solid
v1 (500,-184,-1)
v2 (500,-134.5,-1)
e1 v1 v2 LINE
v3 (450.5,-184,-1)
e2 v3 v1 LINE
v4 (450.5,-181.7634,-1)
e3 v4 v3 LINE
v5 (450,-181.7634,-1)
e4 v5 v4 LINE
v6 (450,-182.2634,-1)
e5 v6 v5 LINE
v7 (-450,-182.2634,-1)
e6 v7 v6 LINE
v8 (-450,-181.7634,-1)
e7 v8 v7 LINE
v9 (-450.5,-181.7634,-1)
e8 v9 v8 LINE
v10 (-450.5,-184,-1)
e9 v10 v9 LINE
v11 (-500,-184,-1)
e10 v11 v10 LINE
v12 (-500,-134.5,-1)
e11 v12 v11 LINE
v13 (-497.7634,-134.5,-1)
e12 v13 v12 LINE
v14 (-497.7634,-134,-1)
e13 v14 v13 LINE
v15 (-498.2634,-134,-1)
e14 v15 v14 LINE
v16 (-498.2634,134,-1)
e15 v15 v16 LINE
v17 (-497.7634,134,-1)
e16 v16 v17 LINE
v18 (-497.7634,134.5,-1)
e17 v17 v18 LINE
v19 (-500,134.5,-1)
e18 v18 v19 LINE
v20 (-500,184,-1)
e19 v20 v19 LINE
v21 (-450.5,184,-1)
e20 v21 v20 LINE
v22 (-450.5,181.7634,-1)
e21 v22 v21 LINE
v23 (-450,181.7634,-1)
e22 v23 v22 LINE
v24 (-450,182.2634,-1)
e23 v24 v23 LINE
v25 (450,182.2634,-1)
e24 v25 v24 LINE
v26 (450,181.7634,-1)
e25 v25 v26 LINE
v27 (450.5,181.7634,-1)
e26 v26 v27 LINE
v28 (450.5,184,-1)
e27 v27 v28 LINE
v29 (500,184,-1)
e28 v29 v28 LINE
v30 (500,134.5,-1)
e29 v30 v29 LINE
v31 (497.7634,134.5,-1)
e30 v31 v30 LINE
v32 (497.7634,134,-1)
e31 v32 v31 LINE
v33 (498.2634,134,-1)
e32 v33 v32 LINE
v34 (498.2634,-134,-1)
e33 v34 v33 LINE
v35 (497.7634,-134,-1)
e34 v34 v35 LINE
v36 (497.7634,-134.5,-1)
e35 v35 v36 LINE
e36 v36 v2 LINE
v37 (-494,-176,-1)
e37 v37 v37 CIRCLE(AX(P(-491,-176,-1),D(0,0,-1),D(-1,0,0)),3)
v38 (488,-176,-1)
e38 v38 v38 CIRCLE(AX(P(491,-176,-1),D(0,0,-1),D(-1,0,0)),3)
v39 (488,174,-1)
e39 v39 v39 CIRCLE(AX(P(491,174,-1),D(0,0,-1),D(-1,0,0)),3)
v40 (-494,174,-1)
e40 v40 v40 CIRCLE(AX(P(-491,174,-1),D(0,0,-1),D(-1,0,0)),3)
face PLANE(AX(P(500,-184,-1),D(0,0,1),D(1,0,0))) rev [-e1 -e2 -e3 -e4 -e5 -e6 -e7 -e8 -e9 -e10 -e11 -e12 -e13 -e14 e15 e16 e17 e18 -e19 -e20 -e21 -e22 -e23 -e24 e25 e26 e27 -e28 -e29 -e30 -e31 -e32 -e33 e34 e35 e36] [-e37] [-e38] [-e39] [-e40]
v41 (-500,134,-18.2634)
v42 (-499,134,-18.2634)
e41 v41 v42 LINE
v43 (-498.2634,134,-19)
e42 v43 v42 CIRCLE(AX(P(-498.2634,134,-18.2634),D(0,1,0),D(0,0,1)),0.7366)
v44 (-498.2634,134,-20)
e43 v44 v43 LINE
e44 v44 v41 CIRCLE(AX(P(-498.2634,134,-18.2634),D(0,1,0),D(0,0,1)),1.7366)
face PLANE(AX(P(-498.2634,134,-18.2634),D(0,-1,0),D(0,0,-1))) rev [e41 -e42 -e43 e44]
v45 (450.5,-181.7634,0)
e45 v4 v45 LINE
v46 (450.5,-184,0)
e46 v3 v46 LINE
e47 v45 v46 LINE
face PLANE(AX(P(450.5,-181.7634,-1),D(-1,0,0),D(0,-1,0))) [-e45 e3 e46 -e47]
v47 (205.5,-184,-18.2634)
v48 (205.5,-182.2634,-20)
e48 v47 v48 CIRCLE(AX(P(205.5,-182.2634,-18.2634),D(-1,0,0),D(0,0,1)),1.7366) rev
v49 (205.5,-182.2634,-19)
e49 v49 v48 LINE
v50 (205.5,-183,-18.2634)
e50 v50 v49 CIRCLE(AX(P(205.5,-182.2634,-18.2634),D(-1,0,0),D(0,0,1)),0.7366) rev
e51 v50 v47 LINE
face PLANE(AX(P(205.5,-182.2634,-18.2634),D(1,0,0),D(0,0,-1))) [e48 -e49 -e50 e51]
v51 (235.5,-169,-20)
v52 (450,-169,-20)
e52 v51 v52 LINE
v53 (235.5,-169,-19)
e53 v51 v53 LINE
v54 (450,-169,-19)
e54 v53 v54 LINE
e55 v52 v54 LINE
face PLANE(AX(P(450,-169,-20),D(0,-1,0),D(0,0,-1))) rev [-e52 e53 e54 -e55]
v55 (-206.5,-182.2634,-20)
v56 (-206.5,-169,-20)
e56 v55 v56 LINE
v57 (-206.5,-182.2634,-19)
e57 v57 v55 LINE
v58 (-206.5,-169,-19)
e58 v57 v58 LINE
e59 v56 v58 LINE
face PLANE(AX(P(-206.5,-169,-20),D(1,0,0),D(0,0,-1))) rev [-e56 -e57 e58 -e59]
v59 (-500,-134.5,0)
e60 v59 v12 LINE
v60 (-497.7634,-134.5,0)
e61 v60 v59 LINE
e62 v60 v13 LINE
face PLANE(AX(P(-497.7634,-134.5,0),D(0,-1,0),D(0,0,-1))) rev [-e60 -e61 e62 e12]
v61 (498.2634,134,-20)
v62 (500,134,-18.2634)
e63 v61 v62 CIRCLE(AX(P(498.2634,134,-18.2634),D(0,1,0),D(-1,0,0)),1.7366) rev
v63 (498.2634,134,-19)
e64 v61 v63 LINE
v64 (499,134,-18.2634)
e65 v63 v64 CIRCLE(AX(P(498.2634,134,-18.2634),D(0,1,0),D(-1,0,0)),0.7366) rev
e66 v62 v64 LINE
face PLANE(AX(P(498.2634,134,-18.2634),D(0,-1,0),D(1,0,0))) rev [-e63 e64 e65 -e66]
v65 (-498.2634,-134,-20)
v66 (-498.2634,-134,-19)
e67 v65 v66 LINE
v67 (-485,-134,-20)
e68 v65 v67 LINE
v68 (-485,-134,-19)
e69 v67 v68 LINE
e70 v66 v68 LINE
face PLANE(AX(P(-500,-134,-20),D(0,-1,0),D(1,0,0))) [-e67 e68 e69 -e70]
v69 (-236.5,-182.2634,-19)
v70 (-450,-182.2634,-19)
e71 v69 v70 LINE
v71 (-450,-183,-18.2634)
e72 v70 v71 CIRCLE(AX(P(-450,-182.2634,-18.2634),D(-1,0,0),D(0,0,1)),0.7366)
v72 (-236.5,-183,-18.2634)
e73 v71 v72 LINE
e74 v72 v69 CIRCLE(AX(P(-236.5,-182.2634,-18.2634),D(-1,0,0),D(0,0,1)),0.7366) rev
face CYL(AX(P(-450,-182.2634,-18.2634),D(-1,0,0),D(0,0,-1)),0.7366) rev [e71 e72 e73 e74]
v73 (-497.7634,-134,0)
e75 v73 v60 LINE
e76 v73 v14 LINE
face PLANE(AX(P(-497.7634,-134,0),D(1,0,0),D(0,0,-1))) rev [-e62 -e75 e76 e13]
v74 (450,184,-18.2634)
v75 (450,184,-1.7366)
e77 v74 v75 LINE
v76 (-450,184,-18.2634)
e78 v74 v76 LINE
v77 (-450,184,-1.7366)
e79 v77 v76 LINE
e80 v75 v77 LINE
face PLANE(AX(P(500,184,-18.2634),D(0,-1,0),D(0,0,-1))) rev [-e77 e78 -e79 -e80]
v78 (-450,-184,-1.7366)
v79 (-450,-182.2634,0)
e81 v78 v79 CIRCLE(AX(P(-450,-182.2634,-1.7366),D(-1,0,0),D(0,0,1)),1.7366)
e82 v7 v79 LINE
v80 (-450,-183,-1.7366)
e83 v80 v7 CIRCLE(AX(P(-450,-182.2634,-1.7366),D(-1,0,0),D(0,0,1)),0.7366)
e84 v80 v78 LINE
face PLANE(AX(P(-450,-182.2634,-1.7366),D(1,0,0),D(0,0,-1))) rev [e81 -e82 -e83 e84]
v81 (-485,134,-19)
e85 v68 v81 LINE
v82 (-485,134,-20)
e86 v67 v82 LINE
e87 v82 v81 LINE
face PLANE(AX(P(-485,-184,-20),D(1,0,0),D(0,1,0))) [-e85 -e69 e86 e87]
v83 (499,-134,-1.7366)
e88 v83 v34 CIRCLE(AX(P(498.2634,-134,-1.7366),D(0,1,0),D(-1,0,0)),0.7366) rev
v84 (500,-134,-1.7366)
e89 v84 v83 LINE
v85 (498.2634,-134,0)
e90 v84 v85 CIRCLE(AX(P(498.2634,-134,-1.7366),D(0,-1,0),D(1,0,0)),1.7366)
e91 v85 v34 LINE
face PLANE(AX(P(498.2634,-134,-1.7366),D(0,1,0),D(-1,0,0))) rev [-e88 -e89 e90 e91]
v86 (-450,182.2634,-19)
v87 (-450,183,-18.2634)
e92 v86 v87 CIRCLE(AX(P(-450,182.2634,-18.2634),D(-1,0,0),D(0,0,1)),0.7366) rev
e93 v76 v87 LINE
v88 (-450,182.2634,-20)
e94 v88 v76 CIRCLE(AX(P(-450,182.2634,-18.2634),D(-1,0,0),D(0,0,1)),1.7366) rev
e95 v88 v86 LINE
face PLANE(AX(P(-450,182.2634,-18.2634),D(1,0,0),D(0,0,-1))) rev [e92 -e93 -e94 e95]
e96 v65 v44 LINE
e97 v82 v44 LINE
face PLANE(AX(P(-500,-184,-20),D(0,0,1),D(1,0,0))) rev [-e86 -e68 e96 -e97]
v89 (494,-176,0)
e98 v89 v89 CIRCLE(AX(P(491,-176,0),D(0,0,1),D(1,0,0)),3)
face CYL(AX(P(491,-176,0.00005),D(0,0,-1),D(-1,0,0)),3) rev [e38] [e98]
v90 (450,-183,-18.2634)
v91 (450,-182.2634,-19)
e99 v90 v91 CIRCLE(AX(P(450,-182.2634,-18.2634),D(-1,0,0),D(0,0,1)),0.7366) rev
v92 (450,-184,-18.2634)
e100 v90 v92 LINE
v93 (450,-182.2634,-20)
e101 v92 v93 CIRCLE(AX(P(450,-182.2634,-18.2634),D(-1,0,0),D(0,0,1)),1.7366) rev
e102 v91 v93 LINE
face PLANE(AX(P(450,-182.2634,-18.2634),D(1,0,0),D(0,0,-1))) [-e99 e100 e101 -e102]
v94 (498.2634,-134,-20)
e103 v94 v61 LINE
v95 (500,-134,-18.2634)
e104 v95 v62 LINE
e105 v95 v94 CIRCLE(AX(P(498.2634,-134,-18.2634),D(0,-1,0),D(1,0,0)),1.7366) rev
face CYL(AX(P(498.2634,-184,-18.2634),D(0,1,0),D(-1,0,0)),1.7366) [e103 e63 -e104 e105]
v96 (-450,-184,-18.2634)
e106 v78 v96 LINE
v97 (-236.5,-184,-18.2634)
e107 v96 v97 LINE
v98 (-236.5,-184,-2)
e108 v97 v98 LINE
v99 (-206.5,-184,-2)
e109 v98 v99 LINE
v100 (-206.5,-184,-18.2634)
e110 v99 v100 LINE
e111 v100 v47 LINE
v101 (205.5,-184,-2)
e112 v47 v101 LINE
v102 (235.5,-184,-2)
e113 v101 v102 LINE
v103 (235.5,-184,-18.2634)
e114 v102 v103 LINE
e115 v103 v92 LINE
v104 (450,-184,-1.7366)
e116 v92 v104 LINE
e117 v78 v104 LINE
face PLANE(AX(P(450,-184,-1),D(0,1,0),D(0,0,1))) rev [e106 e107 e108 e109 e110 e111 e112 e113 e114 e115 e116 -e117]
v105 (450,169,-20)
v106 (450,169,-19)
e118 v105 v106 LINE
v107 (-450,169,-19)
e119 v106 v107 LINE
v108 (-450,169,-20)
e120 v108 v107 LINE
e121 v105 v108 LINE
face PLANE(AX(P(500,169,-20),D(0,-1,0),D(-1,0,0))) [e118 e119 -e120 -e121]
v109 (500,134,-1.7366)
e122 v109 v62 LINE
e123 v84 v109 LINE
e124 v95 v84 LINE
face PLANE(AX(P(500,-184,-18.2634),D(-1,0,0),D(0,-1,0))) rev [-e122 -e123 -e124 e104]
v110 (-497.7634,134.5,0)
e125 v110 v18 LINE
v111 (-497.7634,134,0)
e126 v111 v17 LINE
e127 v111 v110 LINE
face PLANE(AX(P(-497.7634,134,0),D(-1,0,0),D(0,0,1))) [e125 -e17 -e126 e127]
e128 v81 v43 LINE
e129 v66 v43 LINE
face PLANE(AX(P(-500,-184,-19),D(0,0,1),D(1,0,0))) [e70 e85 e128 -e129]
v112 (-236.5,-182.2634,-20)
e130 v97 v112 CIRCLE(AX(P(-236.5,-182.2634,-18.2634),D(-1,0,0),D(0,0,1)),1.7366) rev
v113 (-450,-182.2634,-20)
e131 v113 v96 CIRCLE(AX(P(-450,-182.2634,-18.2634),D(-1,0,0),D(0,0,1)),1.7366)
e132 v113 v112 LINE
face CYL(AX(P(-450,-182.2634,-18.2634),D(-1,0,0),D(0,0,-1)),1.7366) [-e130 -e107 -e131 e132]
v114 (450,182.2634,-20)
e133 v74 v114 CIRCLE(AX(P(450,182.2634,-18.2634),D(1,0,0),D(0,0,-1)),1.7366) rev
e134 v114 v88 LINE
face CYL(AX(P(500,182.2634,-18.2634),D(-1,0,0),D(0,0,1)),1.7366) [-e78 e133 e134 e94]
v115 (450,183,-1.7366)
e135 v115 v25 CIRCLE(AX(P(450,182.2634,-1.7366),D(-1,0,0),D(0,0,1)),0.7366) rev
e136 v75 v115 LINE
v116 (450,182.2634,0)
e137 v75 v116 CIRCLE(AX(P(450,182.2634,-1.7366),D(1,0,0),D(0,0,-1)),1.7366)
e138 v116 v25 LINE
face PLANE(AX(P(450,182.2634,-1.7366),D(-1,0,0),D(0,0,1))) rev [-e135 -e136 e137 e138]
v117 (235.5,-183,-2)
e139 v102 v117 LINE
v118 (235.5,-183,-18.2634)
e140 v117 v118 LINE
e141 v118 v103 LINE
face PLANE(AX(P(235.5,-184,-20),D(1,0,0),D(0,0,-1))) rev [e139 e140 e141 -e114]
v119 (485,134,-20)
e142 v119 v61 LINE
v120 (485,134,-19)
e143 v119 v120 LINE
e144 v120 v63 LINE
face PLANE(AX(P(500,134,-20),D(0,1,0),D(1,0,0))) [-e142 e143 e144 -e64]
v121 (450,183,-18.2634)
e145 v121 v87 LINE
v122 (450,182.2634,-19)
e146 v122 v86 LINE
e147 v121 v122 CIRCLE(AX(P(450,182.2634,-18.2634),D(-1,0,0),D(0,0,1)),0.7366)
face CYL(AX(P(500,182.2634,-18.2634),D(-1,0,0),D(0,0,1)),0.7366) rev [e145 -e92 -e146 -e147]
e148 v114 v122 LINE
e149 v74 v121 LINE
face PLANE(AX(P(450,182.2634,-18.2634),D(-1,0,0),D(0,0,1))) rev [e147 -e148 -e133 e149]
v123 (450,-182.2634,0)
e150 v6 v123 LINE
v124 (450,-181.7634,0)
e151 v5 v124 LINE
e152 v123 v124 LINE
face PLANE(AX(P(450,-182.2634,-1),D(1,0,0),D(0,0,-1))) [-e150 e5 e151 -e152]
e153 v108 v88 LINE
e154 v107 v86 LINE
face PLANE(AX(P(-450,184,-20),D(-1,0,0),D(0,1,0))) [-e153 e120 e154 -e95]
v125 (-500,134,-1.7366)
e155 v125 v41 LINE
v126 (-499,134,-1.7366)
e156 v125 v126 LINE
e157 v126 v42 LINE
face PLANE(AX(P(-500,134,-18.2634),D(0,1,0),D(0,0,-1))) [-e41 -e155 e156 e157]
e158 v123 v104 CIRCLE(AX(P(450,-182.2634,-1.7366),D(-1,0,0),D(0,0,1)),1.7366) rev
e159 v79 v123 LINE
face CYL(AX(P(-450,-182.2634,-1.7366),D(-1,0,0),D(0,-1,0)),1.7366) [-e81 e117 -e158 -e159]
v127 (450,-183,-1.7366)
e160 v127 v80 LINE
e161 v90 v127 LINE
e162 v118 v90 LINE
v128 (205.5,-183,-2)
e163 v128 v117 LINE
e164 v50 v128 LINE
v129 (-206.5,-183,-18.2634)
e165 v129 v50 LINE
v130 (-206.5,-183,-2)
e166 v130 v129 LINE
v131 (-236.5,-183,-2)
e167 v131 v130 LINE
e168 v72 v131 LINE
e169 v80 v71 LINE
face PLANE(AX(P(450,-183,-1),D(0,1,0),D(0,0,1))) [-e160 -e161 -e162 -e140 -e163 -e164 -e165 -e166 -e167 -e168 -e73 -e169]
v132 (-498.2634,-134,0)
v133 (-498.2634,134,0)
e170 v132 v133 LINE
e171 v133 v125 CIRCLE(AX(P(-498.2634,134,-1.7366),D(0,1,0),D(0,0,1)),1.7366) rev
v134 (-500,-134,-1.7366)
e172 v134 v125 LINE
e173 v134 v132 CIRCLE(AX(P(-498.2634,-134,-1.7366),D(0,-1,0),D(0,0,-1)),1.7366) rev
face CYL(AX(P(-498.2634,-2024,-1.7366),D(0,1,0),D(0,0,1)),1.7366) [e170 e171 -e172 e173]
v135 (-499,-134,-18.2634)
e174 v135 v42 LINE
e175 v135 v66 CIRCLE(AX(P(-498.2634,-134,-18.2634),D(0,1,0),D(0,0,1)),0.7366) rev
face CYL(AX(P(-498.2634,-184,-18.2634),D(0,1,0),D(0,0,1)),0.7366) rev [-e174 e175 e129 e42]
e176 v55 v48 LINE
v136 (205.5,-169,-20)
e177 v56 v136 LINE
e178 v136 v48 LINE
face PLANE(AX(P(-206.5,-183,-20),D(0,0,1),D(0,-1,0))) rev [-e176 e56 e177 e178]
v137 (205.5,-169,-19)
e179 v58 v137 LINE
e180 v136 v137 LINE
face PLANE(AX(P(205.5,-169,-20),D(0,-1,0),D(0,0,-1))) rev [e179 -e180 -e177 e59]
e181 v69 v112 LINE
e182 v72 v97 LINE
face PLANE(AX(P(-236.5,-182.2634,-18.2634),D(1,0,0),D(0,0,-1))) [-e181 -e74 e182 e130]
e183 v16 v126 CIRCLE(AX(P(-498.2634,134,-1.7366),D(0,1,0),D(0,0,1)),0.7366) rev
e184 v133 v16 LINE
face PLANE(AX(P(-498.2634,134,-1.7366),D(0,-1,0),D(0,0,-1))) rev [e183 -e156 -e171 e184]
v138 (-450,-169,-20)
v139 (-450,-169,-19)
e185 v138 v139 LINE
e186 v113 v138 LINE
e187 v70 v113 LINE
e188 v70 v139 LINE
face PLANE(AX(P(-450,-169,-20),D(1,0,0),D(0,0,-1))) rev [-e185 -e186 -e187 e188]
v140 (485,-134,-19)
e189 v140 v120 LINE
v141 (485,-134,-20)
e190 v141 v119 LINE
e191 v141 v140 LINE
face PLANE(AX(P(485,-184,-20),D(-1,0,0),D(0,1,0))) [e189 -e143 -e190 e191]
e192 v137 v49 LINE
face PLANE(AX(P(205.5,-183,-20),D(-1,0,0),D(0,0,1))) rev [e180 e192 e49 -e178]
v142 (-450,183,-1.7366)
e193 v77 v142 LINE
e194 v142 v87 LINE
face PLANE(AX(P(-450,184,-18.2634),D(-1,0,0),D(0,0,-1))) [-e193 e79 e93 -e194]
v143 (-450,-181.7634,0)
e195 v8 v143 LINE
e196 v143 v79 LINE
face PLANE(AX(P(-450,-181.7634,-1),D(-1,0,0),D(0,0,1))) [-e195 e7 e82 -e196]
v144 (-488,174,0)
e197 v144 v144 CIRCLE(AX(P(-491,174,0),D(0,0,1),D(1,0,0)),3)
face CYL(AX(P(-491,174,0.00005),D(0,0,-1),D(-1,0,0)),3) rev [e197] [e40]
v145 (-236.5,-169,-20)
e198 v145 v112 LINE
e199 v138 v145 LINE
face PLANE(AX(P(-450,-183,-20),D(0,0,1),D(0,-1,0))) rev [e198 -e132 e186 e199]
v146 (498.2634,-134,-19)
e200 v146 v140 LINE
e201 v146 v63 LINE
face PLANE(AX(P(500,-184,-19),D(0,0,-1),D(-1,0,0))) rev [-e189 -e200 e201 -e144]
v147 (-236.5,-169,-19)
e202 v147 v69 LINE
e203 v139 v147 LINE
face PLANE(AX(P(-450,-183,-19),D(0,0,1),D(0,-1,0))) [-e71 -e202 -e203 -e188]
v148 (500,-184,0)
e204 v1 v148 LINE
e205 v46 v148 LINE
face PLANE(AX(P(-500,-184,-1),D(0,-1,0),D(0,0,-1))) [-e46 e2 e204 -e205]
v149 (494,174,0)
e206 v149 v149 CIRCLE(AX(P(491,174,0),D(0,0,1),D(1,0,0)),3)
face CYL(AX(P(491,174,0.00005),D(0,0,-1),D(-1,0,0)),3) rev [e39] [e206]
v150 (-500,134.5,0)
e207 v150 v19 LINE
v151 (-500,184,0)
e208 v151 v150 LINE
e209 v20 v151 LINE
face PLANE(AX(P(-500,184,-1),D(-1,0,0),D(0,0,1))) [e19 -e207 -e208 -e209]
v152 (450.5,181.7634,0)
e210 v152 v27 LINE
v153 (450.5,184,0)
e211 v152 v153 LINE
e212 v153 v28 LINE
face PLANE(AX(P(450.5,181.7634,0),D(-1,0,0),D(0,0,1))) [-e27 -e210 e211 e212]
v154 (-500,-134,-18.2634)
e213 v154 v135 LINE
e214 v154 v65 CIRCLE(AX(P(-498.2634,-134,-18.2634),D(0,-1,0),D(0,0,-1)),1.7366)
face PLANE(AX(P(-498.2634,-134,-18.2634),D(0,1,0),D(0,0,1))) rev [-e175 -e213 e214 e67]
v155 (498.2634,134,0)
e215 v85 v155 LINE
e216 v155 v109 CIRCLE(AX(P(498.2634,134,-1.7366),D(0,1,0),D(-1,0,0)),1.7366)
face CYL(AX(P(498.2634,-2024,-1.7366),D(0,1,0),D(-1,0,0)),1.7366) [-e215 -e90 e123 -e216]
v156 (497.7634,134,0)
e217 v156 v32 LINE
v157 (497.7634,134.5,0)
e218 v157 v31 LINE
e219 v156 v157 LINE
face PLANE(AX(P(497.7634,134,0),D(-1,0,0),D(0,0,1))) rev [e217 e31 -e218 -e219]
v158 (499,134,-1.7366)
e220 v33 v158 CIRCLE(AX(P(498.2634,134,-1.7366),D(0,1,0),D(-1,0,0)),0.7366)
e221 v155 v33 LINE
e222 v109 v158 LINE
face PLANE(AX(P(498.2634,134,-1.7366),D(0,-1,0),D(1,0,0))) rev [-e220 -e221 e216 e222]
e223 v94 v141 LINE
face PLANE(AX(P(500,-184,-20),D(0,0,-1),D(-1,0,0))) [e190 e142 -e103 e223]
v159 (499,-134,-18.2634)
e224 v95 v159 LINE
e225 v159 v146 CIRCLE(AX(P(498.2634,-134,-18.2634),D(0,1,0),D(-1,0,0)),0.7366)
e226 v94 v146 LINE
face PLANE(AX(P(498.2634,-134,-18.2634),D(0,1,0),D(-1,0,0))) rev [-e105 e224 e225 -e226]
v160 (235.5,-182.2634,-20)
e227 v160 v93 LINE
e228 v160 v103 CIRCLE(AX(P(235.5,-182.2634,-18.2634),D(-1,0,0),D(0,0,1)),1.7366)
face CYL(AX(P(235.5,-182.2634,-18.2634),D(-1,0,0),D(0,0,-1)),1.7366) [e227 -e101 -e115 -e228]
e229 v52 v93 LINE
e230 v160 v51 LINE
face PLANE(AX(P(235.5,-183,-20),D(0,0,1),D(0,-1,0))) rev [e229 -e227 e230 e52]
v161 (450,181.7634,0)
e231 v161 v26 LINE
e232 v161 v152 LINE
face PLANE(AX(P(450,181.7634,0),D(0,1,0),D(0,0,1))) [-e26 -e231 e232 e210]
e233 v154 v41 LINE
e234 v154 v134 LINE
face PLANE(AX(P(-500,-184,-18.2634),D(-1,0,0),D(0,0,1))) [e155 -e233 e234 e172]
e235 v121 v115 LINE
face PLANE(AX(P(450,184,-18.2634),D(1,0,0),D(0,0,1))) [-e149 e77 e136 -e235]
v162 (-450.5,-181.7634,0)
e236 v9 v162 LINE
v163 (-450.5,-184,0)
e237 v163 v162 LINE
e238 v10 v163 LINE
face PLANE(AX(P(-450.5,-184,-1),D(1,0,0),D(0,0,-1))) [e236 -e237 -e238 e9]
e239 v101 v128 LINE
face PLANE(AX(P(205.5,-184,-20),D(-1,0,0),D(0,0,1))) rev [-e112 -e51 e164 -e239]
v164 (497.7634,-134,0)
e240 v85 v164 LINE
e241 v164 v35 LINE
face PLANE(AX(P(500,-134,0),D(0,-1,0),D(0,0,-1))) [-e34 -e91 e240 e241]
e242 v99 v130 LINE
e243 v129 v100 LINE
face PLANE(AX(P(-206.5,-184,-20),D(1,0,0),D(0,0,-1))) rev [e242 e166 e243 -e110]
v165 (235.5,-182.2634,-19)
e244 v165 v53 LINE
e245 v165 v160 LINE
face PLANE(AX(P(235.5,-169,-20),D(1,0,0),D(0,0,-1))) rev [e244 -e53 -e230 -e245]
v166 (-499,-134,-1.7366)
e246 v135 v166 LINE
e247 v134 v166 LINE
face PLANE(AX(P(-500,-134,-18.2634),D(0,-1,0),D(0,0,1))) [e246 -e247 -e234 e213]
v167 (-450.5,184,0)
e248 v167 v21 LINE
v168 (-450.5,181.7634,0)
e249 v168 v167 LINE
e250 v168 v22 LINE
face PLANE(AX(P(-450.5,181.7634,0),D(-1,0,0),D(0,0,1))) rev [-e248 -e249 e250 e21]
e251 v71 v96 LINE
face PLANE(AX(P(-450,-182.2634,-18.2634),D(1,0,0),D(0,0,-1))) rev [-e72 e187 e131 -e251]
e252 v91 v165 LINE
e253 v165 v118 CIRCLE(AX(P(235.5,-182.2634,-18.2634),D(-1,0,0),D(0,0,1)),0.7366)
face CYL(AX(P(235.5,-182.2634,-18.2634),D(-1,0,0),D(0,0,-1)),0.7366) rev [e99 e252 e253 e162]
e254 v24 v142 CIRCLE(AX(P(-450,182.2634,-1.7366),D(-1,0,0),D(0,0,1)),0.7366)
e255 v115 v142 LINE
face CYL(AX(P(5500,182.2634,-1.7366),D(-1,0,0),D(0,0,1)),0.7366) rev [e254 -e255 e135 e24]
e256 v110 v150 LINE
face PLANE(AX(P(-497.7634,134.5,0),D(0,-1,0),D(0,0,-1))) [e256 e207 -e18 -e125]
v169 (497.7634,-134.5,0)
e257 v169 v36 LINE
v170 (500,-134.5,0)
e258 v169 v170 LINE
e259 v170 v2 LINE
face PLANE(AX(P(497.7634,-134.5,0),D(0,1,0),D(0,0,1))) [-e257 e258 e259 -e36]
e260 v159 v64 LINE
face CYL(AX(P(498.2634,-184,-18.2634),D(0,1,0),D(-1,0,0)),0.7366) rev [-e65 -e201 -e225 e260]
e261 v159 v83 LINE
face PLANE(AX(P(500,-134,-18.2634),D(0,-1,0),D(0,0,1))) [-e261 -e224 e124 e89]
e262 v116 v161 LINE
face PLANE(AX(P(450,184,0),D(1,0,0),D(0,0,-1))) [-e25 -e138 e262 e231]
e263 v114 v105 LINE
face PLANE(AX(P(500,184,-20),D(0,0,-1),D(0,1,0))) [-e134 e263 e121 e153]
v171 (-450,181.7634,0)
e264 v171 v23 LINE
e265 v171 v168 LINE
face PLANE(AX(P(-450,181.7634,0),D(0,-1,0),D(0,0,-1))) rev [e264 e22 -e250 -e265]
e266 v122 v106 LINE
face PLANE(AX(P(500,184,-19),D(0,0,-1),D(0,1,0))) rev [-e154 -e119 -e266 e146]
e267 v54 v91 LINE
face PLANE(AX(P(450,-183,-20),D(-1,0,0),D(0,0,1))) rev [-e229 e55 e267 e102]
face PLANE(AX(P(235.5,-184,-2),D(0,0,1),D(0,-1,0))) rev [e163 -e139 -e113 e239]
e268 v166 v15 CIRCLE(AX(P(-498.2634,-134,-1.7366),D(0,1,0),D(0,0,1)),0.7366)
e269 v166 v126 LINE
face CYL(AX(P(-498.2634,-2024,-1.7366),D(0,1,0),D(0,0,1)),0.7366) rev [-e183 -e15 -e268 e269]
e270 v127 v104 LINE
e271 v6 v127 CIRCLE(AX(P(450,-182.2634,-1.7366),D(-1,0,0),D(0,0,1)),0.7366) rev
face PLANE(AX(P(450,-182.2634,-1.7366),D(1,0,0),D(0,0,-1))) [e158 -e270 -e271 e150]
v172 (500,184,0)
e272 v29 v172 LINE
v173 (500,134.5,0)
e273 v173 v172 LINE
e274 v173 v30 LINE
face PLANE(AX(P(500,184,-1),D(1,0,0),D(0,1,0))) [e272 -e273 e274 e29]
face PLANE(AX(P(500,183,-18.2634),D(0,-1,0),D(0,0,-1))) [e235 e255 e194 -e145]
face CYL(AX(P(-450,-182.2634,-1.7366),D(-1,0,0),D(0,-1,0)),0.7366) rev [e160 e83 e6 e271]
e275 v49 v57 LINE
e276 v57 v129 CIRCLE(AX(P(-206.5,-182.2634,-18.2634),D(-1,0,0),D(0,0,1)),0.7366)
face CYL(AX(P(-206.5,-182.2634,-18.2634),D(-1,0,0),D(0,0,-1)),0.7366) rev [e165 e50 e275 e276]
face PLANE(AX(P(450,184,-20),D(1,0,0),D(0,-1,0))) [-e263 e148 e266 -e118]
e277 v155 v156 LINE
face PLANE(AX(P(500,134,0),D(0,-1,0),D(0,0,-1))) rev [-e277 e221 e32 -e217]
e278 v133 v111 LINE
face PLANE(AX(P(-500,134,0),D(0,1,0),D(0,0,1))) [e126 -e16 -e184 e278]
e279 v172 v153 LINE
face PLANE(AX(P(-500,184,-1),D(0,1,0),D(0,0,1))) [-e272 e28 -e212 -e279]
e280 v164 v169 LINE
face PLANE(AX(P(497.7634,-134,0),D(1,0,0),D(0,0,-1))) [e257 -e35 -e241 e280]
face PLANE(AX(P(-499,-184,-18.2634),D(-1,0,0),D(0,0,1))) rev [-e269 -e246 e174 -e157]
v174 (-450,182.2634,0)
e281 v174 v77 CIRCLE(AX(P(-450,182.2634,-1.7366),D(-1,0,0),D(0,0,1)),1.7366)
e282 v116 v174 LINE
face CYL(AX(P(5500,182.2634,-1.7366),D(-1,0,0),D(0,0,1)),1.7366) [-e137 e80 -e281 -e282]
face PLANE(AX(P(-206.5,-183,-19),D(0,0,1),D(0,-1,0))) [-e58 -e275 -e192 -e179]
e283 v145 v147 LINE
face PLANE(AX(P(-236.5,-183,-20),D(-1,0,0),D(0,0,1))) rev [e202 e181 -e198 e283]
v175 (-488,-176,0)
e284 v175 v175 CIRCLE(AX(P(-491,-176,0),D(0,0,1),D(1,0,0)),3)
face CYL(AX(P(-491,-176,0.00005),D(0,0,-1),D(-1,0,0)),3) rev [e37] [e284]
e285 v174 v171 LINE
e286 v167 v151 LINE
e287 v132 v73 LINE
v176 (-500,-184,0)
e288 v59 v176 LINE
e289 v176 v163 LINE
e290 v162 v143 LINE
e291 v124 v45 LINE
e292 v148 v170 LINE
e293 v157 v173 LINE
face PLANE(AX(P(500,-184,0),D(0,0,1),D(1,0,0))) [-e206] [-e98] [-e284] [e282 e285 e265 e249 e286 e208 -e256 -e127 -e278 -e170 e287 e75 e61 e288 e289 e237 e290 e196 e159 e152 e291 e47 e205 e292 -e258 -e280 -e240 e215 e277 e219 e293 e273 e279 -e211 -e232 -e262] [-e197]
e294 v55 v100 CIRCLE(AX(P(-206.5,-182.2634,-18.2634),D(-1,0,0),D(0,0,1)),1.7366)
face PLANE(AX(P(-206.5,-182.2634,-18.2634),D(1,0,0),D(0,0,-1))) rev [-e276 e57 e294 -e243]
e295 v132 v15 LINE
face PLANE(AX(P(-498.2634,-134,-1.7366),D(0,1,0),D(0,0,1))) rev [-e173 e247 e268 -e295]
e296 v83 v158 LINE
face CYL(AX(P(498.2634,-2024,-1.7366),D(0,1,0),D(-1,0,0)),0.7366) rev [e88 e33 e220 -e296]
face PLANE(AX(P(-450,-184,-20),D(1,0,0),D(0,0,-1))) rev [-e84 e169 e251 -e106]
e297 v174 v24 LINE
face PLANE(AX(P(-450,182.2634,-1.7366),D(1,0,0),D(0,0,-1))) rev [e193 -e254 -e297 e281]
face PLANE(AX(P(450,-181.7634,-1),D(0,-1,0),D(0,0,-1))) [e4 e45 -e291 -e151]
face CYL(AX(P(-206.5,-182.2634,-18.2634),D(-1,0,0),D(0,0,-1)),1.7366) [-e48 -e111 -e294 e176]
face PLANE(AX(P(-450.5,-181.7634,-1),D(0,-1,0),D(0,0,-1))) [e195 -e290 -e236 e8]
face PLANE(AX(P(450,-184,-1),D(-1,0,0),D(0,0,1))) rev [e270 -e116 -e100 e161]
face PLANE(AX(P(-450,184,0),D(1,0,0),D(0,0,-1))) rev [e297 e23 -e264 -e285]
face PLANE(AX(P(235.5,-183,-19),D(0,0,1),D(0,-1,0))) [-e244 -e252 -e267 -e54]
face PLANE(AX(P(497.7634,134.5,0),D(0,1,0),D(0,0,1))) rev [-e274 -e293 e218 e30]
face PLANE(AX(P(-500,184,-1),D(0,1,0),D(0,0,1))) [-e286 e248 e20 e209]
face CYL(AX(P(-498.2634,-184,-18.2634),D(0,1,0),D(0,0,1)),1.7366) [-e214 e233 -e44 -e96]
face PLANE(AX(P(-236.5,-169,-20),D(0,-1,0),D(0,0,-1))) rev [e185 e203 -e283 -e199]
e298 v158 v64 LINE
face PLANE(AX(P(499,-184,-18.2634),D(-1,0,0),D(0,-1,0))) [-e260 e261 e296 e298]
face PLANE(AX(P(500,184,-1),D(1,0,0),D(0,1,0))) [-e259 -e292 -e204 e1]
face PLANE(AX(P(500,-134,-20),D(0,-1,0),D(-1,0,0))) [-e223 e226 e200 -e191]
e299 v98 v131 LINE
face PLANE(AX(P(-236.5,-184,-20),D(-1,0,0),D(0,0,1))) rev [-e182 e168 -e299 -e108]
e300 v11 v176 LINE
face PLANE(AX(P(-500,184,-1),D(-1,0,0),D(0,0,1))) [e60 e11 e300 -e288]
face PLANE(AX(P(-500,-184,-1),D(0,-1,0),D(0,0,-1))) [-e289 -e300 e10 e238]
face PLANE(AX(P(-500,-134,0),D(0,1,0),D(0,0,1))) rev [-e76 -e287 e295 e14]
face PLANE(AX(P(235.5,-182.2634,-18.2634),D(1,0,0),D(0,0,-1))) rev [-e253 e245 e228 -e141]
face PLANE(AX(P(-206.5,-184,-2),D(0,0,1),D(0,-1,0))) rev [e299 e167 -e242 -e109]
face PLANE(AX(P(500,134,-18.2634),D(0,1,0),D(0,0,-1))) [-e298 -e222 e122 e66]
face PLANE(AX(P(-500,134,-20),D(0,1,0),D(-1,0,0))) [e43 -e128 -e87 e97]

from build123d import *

# Parameters (mm, degrees)
SKETCH_1_W                         = 1000
SKETCH_1_H                         = 368
SM_BASE_FLANGE_1_DEPTH             = 1
OTHER_START                        = -134.5
OTHER_1_DEPTH                      = 269
OTHER_1_2_DEPTH                    = 0.5
OTHER_START_2                      = 134
OTHER_1_3_DEPTH                    = 0.5
OTHER_START_3                      = -134
OTHER_1_4_DEPTH                    = 268
OTHER_START_4                      = -450.5
OTHER_2_DEPTH                      = 901
OTHER_2_2_DEPTH                    = 0.5
OTHER_START_5                      = 450
OTHER_2_3_DEPTH                    = 0.5
OTHER_START_6                      = -450
OTHER_2_4_DEPTH                    = 900
SM_EDGE_FLANGE_1_STRIP_W           = 5.4732
SM_EDGE_FLANGE_1_STRIP_H           = 1
SM_EDGE_FLANGE_1_STRIP_CUT_DEPTH   = 900
SM_EDGE_FLANGE_1_RELIEF_W          = 5.9732
SM_EDGE_FLANGE_1_RELIEF_H          = 0.5
SM_EDGE_FLANGE_1_RELIEF_CUT_DEPTH  = 1
SM_EDGE_FLANGE_1_DEPTH             = 900
SM_EDGE_FLANGE_1_FLAT_DEPTH        = 1
SM_EDGE_FLANGE_2_STRIP_W           = 5.4732
SM_EDGE_FLANGE_2_STRIP_H           = 1
SM_EDGE_FLANGE_2_STRIP_CUT_DEPTH   = 214.5
SM_EDGE_FLANGE_2_STRIP_2_W         = 5.4732
SM_EDGE_FLANGE_2_STRIP_2_H         = 1
SM_EDGE_FLANGE_2_STRIP_CUT_2_DEPTH = 412
SM_EDGE_FLANGE_2_STRIP_3_W         = 5.4732
SM_EDGE_FLANGE_2_STRIP_3_H         = 1
SM_EDGE_FLANGE_2_STRIP_CUT_3_DEPTH = 213.5
SM_EDGE_FLANGE_2_DEPTH             = 214.5
SM_EDGE_FLANGE_2_BEND_DEPTH        = 412
SM_EDGE_FLANGE_2_BEND_2_DEPTH      = 213.5
SKETCH_19_R                        = 3
CUT_EXTRUDE_1_DEPTH                = 534.120061525


# Read off the part's stored shape, not the designer's step: 斜接法兰1, 斜接法兰2
# Sheet-metal steps are written as plain solids
with BuildPart() as part:
    # Sketch 1 → 基体-法兰1 (new body)
    with BuildSketch(Plane.XY):
        Rectangle(SKETCH_1_W, SKETCH_1_H)
    extrude(amount=-SM_BASE_FLANGE_1_DEPTH)

    # Other 1 outline → Other 1 (cut)
    with BuildSketch(Plane(origin=(0, 0, 0), x_dir=(1, 0, 0), z_dir=(0, 1, 0)).offset(OTHER_START)):
        with BuildLine():
            Line((500, 1), (499.83604109, 1))
            ThreePointArc((499.83604109, 1), (499.195226164, 0.271171885), (498.2634, 0))
            Line((498.2634, 0), (500, 0))
            Line((500, 0), (500, 1))
        make_face()
    other_1 = extrude(amount=OTHER_1_DEPTH, mode=Mode.SUBTRACT)

    # Other 1 2 outline → Other 1 2 (cut)
    with BuildSketch(Plane(origin=(0, 0, 0), x_dir=(1, 0, 0), z_dir=(0, 1, 0)).offset(OTHER_START)):
        with BuildLine():
            ThreePointArc((498.2634, 0), (499.195226164, 0.271171885), (499.83604109, 1))
            Line((499.83604109, 1), (497.7634, 1))
            Line((497.7634, 1), (497.7634, 0))
            Line((497.7634, 0), (498.2634, 0))
        make_face()
    other_1_2 = extrude(amount=OTHER_1_2_DEPTH, mode=Mode.SUBTRACT)

    # Other 1 3 outline → Other 1 3 (cut)
    with BuildSketch(Plane(origin=(0, 0, 0), x_dir=(1, 0, 0), z_dir=(0, 1, 0)).offset(OTHER_START_2)):
        with BuildLine():
            ThreePointArc((498.2634, 0), (499.195226164, 0.271171885), (499.83604109, 1))
            Line((499.83604109, 1), (497.7634, 1))
            Line((497.7634, 1), (497.7634, 0))
            Line((497.7634, 0), (498.2634, 0))
        make_face()
    other_1_3 = extrude(amount=OTHER_1_3_DEPTH, mode=Mode.SUBTRACT)

    # Other 1 4 outline → Other 1 4 (add)
    with BuildSketch(Plane(origin=(0, 0, 0), x_dir=(1, 0, 0), z_dir=(0, 1, 0)).offset(OTHER_START_3)):
        with BuildLine():
            Line((500, 1.7366), (500, 18.2634))
            ThreePointArc((500, 18.2634), (499.491361636, 19.491361636), (498.2634, 20))
            Line((498.2634, 20), (485, 20))
            Line((485, 20), (485, 19))
            Line((485, 19), (498.2634, 19))
            ThreePointArc((498.2634, 19), (498.784254855, 18.784254855), (499, 18.2634))
            Line((499, 18.2634), (499, 1.7366))
            ThreePointArc((499, 1.7366), (498.784254855, 1.215745145), (498.2634, 1))
            Line((498.2634, 1), (499.83604109, 1))
            ThreePointArc((499.83604109, 1), (499.958514757, 1.359286442), (500, 1.7366))
        make_face()
    other_1_4 = extrude(amount=OTHER_1_4_DEPTH)

    # Other 2 outline → Other 2 (cut)
    with BuildSketch(Plane.YZ.offset(OTHER_START_4)):
        with BuildLine():
            ThreePointArc((182.2634, 0), (183.195226164, -0.271171885), (183.83604109, -1))
            Line((183.83604109, -1), (184, -1))
            Line((184, -1), (184, 0))
            Line((184, 0), (182.2634, 0))
        make_face()
    extrude(amount=OTHER_2_DEPTH, mode=Mode.SUBTRACT)

    # Other 2 2 outline → Other 2 2 (cut)
    with BuildSketch(Plane.YZ.offset(OTHER_START_4)):
        with BuildLine():
            Line((181.7634, -1), (183.83604109, -1))
            ThreePointArc((183.83604109, -1), (183.195226164, -0.271171885), (182.2634, 0))
            Line((182.2634, 0), (181.7634, 0))
            Line((181.7634, 0), (181.7634, -1))
        make_face()
    extrude(amount=OTHER_2_2_DEPTH, mode=Mode.SUBTRACT)

    # Other 2 3 outline → Other 2 3 (cut)
    with BuildSketch(Plane.YZ.offset(OTHER_START_5)):
        with BuildLine():
            Line((181.7634, -1), (183.83604109, -1))
            ThreePointArc((183.83604109, -1), (183.195226164, -0.271171885), (182.2634, 0))
            Line((182.2634, 0), (181.7634, 0))
            Line((181.7634, 0), (181.7634, -1))
        make_face()
    extrude(amount=OTHER_2_3_DEPTH, mode=Mode.SUBTRACT)

    # Other 2 4 outline → Other 2 4 (add)
    with BuildSketch(Plane.YZ.offset(OTHER_START_6)):
        with BuildLine():
            Line((184, -18.2634), (184, -1.7366))
            ThreePointArc((184, -1.7366), (183.958514757, -1.359286442), (183.83604109, -1))
            Line((183.83604109, -1), (182.2634, -1))
            ThreePointArc((182.2634, -1), (182.784254855, -1.215745145), (183, -1.7366))
            Line((183, -1.7366), (183, -18.2634))
            ThreePointArc((183, -18.2634), (182.784254855, -18.784254855), (182.2634, -19))
            Line((182.2634, -19), (169, -19))
            Line((169, -19), (169, -20))
            Line((169, -20), (182.2634, -20))
            ThreePointArc((182.2634, -20), (183.491361636, -19.491361636), (184, -18.2634))
        make_face()
    extrude(amount=OTHER_2_4_DEPTH)

    # 镜向1: Other 1, Other 1 2, Other 1 3, Other 1 4 across plane
    add(other_1.mirror(Plane(origin=(0, 0, 0), x_dir=(0, 0, 1), z_dir=(1, 0, 0))), mode=Mode.SUBTRACT)
    add(other_1_2.mirror(Plane(origin=(0, 0, 0), x_dir=(0, 0, 1), z_dir=(1, 0, 0))), mode=Mode.SUBTRACT)
    add(other_1_3.mirror(Plane(origin=(0, 0, 0), x_dir=(0, 0, 1), z_dir=(1, 0, 0))), mode=Mode.SUBTRACT)
    add(other_1_4.mirror(Plane(origin=(0, 0, 0), x_dir=(0, 0, 1), z_dir=(1, 0, 0))))

    # 边线-法兰1 strip (across the edge) → 边线-法兰1 strip cut (cut)
    with BuildSketch(Plane(origin=(450, -184, -1), x_dir=(0, 1, 0), z_dir=(-1, 0, 0))):
        with Locations((-1, -0.5)):
            Rectangle(SM_EDGE_FLANGE_1_STRIP_W, SM_EDGE_FLANGE_1_STRIP_H)
    extrude(amount=SM_EDGE_FLANGE_1_STRIP_CUT_DEPTH, mode=Mode.SUBTRACT)

    # 边线-法兰1 relief (on the sheet) → 边线-法兰1 relief cut (cut)
    with BuildSketch(Plane(origin=(450, -182.2634, -1), x_dir=(0, 1, 0), z_dir=(0, 0, -1))):
        with Locations((-2.4866, 0.25)):
            Rectangle(SM_EDGE_FLANGE_1_RELIEF_W, SM_EDGE_FLANGE_1_RELIEF_H)
        with Locations((-2.4866, -900.25)):
            Rectangle(SM_EDGE_FLANGE_1_RELIEF_W, SM_EDGE_FLANGE_1_RELIEF_H)
    extrude(amount=-SM_EDGE_FLANGE_1_RELIEF_CUT_DEPTH, mode=Mode.SUBTRACT)

    # 边线-法兰1 bend section (across the edge) → 边线-法兰1 (add)
    with BuildSketch(Plane(origin=(450, -184, -1), x_dir=(0, 1, 0), z_dir=(-1, 0, 0))):
        with BuildLine():
            Line((0, 0.7366), (1, 0.7366))
            ThreePointArc((1, 0.7366), (1.215745145, 0.215745145), (1.7366, 0))
            Line((1.7366, 0), (1.7366, -1))
            ThreePointArc((1.7366, -1), (0.508638364, -0.491361636), (0, 0.7366))
        make_face()
    extrude(amount=SM_EDGE_FLANGE_1_DEPTH)

    # 边线-法兰1 profile (on flange) → 边线-法兰1 flat (add)
    with BuildSketch(Plane(origin=(0, -184, -1), x_dir=(-1, 0, 0), z_dir=(0, -1, 0))):
        Polygon((-450, 0.7366), (450, 0.7366), (450, 19), (236.5, 19), (236.5, 1), (206.5, 1), (206.5, 19), (-205.5, 19), (-205.5, 1), (-235.5, 1), (-235.5, 19), (-450, 19), align=None)
    extrude(amount=-SM_EDGE_FLANGE_1_FLAT_DEPTH)

    # 边线-法兰2 strip (across the edge) → 边线-法兰2 strip cut (cut)
    with BuildSketch(Plane(origin=(450, -183, -20), x_dir=(0, 0, 1), z_dir=(-1, 0, 0))):
        with Locations((-1, -0.5)):
            Rectangle(SM_EDGE_FLANGE_2_STRIP_W, SM_EDGE_FLANGE_2_STRIP_H)
    extrude(amount=SM_EDGE_FLANGE_2_STRIP_CUT_DEPTH, mode=Mode.SUBTRACT)

    # 边线-法兰2 strip 2 (across the edge) → 边线-法兰2 strip cut 2 (cut)
    with BuildSketch(Plane(origin=(205.5, -183, -20), x_dir=(0, 0, 1), z_dir=(-1, 0, 0))):
        with Locations((-1, -0.5)):
            Rectangle(SM_EDGE_FLANGE_2_STRIP_2_W, SM_EDGE_FLANGE_2_STRIP_2_H)
    extrude(amount=SM_EDGE_FLANGE_2_STRIP_CUT_2_DEPTH, mode=Mode.SUBTRACT)

    # 边线-法兰2 strip 3 (across the edge) → 边线-法兰2 strip cut 3 (cut)
    with BuildSketch(Plane(origin=(-236.5, -183, -20), x_dir=(0, 0, 1), z_dir=(-1, 0, 0))):
        with Locations((-1, -0.5)):
            Rectangle(SM_EDGE_FLANGE_2_STRIP_3_W, SM_EDGE_FLANGE_2_STRIP_3_H)
    extrude(amount=SM_EDGE_FLANGE_2_STRIP_CUT_3_DEPTH, mode=Mode.SUBTRACT)

    # 边线-法兰2 section (across the edge) → 边线-法兰2 (add)
    with BuildSketch(Plane(origin=(450, -183, -20), x_dir=(0, 0, 1), z_dir=(-1, 0, 0))):
        with BuildLine():
            Line((0, 0.7366), (0, 14))
            Line((0, 14), (1, 14))
            Line((1, 14), (1, 0.7366))
            ThreePointArc((1, 0.7366), (1.215745145, 0.215745145), (1.7366, 0))
            Line((1.7366, 0), (1.7366, -1))
            ThreePointArc((1.7366, -1), (0.508638364, -0.491361636), (0, 0.7366))
        make_face()
    extrude(amount=SM_EDGE_FLANGE_2_DEPTH)

    # 边线-法兰2 section 2 (across the edge) → 边线-法兰2 bend (add)
    with BuildSketch(Plane(origin=(205.5, -183, -20), x_dir=(0, 0, 1), z_dir=(-1, 0, 0))):
        with BuildLine():
            Line((0, 0.7366), (0, 14))
            Line((0, 14), (1, 14))
            Line((1, 14), (1, 0.7366))
            ThreePointArc((1, 0.7366), (1.215745145, 0.215745145), (1.7366, 0))
            Line((1.7366, 0), (1.7366, -1))
            ThreePointArc((1.7366, -1), (0.508638364, -0.491361636), (0, 0.7366))
        make_face()
    extrude(amount=SM_EDGE_FLANGE_2_BEND_DEPTH)

    # 边线-法兰2 section 3 (across the edge) → 边线-法兰2 bend 2 (add)
    with BuildSketch(Plane(origin=(-236.5, -183, -20), x_dir=(0, 0, 1), z_dir=(-1, 0, 0))):
        with BuildLine():
            Line((0, 0.7366), (0, 14))
            Line((0, 14), (1, 14))
            Line((1, 14), (1, 0.7366))
            ThreePointArc((1, 0.7366), (1.215745145, 0.215745145), (1.7366, 0))
            Line((1.7366, 0), (1.7366, -1))
            ThreePointArc((1.7366, -1), (0.508638364, -0.491361636), (0, 0.7366))
        make_face()
    extrude(amount=SM_EDGE_FLANGE_2_BEND_2_DEPTH)

    # 草图19 → 切除-拉伸1 (cut, through all)
    with BuildSketch(Plane(origin=(0, 0, -1), x_dir=(-1, 0, 0), z_dir=(0, 0, -1))):
        with Locations((-491, 174)):
            Circle(SKETCH_19_R)
        with Locations((-491, -176)):
            Circle(SKETCH_19_R)
        with Locations((491, -176)):
            Circle(SKETCH_19_R)
        with Locations((491, 174)):
            Circle(SKETCH_19_R)
    extrude(amount=-CUT_EXTRUDE_1_DEPTH, mode=Mode.SUBTRACT)


solid = part.part
